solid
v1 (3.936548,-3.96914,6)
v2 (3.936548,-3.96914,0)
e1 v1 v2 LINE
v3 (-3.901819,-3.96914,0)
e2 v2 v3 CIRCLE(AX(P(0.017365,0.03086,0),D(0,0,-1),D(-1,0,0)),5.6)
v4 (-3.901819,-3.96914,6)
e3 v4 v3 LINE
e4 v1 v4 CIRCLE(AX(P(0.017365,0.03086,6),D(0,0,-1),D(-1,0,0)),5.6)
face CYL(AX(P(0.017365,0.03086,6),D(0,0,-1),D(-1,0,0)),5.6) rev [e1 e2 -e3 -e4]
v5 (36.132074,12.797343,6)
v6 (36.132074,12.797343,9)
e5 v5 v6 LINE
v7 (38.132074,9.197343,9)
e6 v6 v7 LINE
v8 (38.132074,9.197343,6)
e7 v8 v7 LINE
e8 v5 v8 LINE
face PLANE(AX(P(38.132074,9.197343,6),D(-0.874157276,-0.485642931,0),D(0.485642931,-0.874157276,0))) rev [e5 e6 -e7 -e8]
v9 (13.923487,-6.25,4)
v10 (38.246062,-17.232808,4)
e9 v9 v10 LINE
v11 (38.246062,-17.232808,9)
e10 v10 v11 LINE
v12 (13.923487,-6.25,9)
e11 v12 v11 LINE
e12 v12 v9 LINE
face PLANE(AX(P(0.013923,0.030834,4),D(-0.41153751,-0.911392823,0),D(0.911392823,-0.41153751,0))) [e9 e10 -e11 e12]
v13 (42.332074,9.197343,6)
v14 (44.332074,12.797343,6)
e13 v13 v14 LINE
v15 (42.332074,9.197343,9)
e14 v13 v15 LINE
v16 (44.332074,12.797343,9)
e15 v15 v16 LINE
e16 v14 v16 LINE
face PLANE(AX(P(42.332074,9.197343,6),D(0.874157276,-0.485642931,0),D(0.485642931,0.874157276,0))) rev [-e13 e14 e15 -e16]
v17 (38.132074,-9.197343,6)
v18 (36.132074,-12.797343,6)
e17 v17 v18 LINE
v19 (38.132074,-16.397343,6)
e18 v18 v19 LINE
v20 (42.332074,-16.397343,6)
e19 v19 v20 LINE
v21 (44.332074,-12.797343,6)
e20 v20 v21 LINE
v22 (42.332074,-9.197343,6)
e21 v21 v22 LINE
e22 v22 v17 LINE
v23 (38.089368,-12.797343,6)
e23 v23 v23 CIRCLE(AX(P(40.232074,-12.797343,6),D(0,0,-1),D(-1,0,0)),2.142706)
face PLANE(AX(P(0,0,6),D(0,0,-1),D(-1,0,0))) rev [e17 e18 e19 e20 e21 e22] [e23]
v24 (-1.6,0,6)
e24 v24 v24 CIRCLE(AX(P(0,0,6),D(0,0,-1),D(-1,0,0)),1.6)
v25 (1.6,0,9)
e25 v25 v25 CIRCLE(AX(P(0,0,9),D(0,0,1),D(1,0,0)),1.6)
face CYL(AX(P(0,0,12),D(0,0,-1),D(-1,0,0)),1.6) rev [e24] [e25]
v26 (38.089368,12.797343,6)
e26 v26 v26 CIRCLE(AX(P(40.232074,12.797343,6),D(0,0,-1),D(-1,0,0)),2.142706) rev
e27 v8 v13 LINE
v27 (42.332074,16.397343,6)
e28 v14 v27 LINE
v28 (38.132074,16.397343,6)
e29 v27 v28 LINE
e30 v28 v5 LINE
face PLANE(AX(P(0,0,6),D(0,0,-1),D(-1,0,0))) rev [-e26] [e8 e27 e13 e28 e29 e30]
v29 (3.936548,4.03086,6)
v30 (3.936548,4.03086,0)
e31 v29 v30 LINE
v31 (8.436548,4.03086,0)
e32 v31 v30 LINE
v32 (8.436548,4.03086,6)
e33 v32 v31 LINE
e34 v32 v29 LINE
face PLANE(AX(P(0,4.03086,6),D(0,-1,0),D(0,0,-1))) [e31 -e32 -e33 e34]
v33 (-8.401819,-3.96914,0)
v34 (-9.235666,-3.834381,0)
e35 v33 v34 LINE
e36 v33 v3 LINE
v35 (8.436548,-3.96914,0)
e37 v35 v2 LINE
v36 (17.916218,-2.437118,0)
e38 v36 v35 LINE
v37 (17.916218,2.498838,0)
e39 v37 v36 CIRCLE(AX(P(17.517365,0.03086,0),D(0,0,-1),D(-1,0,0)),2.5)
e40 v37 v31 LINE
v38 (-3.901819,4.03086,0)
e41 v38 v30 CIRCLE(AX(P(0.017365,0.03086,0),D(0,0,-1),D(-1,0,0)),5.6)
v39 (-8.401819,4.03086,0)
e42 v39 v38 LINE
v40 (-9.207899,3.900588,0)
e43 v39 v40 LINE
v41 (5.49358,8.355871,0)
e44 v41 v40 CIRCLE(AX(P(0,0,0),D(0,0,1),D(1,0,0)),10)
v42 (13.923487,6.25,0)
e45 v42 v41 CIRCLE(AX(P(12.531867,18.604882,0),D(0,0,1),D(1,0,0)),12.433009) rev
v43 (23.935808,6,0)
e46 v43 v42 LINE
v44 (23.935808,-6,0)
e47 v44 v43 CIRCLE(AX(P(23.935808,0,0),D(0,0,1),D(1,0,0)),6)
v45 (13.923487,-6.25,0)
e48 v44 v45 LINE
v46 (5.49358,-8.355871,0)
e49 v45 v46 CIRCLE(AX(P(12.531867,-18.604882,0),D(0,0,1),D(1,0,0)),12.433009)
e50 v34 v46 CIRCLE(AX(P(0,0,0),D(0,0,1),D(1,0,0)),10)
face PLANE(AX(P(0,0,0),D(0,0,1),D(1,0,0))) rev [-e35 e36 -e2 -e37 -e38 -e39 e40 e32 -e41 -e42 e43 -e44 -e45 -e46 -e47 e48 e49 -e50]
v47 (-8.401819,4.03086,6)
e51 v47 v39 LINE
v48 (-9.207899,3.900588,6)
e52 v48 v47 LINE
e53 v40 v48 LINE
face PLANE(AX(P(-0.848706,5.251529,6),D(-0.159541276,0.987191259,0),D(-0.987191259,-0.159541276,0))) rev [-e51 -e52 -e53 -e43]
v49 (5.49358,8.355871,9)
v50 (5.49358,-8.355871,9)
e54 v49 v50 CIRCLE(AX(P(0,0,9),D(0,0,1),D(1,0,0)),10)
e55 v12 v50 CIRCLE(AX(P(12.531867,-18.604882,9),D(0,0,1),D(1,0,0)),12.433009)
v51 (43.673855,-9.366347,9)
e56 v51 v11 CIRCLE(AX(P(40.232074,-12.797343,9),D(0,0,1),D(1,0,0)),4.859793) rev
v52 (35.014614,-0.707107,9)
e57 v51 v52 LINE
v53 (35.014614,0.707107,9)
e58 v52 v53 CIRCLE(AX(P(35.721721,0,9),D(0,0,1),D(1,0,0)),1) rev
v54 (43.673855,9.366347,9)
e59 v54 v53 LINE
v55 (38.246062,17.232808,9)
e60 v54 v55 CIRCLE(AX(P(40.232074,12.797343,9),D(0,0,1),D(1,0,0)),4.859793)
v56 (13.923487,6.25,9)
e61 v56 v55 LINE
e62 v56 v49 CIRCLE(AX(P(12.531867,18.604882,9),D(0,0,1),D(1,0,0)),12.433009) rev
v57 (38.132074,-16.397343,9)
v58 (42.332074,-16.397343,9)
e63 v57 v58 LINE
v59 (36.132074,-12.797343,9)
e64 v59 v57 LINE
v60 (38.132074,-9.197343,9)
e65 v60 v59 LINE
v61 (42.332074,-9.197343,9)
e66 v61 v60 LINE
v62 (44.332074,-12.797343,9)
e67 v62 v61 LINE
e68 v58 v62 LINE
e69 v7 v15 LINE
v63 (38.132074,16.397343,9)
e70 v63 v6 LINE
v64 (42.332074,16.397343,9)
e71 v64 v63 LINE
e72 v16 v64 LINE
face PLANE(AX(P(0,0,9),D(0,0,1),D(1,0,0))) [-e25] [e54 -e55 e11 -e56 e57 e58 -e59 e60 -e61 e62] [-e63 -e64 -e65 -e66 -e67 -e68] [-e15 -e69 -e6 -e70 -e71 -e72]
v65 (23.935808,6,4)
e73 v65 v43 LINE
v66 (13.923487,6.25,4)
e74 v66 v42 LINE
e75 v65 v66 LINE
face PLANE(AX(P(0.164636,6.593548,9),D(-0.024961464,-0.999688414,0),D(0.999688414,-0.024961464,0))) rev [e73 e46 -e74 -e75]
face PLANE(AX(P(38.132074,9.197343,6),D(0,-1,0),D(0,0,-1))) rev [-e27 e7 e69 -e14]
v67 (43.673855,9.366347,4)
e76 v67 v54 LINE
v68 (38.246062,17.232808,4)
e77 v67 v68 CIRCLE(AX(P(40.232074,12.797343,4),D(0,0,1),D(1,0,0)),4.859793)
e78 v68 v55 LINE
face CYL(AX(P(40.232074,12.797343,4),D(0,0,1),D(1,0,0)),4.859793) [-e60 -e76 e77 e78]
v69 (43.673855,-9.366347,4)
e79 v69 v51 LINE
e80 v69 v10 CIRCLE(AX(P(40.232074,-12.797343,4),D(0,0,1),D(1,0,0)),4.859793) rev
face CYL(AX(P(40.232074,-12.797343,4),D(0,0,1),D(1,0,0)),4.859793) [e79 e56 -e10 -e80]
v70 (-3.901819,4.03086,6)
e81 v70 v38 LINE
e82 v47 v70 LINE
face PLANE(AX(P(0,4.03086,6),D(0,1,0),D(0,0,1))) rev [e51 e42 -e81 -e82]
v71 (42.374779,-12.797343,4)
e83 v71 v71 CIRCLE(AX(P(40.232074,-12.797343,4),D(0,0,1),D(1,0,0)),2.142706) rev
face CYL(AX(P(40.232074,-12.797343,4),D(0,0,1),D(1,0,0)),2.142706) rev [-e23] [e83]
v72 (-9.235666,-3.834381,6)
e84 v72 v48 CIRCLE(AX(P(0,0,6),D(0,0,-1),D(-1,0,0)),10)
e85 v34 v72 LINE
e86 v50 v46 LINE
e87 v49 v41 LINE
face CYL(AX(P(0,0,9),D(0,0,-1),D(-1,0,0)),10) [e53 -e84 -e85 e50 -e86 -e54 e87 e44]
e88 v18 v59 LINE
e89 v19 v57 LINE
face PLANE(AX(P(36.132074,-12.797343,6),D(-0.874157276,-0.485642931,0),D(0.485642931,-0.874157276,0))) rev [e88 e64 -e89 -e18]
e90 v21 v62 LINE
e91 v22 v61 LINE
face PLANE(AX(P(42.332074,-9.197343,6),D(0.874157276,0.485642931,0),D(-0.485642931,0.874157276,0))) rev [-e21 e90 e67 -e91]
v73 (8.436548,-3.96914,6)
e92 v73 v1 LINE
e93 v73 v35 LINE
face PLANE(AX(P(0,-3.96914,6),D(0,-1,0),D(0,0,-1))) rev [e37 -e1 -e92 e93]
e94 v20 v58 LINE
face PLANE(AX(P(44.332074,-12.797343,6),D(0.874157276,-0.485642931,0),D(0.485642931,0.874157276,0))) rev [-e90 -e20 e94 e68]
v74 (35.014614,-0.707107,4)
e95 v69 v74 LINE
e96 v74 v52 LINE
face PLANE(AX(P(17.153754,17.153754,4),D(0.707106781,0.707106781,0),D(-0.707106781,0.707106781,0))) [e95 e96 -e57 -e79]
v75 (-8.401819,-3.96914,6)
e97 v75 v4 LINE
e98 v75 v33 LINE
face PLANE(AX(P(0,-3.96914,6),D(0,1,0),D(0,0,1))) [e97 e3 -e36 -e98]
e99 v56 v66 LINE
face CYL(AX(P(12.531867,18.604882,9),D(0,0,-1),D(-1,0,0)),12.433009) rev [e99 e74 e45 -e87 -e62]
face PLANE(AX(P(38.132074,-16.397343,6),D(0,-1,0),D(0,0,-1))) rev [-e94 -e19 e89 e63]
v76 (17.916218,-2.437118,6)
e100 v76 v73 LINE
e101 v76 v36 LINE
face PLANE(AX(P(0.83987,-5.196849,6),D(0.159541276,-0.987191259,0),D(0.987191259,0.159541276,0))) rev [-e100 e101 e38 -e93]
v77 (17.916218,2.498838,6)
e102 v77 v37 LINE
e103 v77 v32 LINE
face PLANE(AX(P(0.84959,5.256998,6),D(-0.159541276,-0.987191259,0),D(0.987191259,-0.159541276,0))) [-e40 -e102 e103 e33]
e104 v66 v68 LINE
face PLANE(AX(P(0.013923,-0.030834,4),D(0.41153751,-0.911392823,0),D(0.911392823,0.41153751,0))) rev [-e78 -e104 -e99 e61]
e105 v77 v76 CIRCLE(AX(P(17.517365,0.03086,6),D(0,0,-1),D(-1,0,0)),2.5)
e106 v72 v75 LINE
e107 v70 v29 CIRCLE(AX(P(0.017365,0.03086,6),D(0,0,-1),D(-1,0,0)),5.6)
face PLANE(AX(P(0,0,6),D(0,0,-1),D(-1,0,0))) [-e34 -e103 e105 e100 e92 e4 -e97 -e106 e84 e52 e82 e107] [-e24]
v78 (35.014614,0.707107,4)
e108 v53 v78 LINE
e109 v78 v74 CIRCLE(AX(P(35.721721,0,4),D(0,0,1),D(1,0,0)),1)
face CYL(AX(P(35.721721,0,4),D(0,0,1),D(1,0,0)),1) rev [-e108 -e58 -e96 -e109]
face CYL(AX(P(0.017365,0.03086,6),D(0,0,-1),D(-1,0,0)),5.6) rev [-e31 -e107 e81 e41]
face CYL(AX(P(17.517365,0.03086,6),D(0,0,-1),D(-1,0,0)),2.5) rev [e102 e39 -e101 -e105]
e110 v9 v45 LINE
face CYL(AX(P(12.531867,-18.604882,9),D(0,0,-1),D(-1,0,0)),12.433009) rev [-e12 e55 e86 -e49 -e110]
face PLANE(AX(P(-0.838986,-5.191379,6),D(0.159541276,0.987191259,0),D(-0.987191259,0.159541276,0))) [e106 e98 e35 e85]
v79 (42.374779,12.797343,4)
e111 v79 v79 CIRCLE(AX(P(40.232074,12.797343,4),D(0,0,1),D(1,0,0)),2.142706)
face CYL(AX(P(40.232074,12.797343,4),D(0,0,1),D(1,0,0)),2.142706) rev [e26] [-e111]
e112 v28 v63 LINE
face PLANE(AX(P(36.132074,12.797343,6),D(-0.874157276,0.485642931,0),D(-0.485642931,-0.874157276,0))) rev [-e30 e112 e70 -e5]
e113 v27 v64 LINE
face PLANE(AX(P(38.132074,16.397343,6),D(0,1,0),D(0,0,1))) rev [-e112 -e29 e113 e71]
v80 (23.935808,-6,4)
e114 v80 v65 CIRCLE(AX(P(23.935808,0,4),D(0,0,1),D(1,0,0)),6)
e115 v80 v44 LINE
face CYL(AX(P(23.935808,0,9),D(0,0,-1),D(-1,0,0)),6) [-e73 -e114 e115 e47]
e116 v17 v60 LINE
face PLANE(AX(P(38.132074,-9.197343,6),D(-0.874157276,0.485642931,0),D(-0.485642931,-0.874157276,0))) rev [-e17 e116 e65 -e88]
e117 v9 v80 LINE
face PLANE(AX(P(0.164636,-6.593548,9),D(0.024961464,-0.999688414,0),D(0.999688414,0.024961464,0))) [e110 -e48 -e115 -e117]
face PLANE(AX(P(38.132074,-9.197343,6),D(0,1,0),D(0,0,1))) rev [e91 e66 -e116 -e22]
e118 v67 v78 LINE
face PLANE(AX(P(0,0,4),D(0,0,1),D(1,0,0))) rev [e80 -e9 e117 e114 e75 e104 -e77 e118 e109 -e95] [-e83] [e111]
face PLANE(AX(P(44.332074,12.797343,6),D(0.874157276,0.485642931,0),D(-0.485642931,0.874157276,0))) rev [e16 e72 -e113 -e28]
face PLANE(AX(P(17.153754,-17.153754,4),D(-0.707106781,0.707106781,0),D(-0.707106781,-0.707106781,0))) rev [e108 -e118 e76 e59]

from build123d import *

# Parameters (mm, degrees)
BOSS_EXTRUDE1_DEPTH = 9
BOSS_EXTRUDE2_START = -5
SKETCH6_R           = 2.142705637
BOSS_EXTRUDE2_DEPTH = 5
CUT_EXTRUDE1_DEPTH  = 6
SKETCH9_R           = 1.6
CUT_EXTRUDE2_DEPTH  = 6
CUT_EXTRUDE3_DEPTH  = 3
FILLET1_R           = 1


with BuildPart() as part:
    # Sketch2 → Boss-Extrude1 (new body)
    with BuildSketch(Plane.XY):
        with BuildLine():
            Line((13.923486695, -6.250000093), (23.935808117, -6))
            ThreePointArc((23.935808117, -6), (29.935808117, 0), (23.935808117, 6))
            Line((23.935808117, 6), (13.923486695, 6.250000093))
            ThreePointArc((13.923486695, 6.250000093), (9.518581948, 6.542551177), (5.493579732, 8.355871093))
            ThreePointArc((5.493579732, 8.355871093), (-10, 0), (5.493579732, -8.355871093))
            ThreePointArc((5.493579732, -8.355871093), (9.518581948, -6.542551177), (13.923486695, -6.250000093))
        make_face()
    extrude(amount=BOSS_EXTRUDE1_DEPTH)

    # Sketch6 → Boss-Extrude2 (add)
    with BuildSketch(Plane.XY.offset(9).offset(BOSS_EXTRUDE2_START)):
        with BuildLine():
            Line((38.246061815, 17.232807658), (13.923486695, 6.250000093))
            Line((13.923486695, 6.250000093), (23.935808117, 6))
            ThreePointArc((23.935808117, 6), (28.178449102, 4.242640389), (29.935808117, -8.43e-07))
            ThreePointArc((29.935808117, -8.43e-07), (28.178448506, -4.242640985), (23.935808117, -6))
            Line((23.935808117, -6), (13.923486695, -6.250000093))
            Line((13.923486695, -6.250000093), (38.246061815, -17.232807658))
            ThreePointArc((38.246061815, -17.232807658), (42.874608669, -16.875896473), (45.091866788, -12.797343053))
            ThreePointArc((45.091866788, -12.797343053), (44.723394897, -10.941104168), (43.673854661, -9.366347162))
            Line((43.673854661, -9.366347162), (34.3075075, 0))
            Line((34.3075075, 0), (43.673854661, 9.366347162))
            ThreePointArc((43.673854661, 9.366347162), (44.723394897, 10.941104168), (45.091866788, 12.797343053))
            ThreePointArc((45.091866788, 12.797343053), (42.874608669, 16.875896473), (38.246061815, 17.232807658))
        make_face()
        with Locations((40.232073655, -12.797343053)):
            Circle(SKETCH6_R, mode=Mode.SUBTRACT)
        with Locations((40.232073655, 12.797343053)):
            Circle(SKETCH6_R, mode=Mode.SUBTRACT)
    extrude(amount=BOSS_EXTRUDE2_DEPTH)

    # Sketch7 → Cut-Extrude1 (cut)
    with BuildSketch(Plane(origin=(0, 0, 0), x_dir=(-1, 0, 0), z_dir=(0, 0, -1))):
        with BuildLine():
            ThreePointArc((17.881488686, -2.43711799), (19.982635496, 0.030860156), (17.881488686, 2.498838303))
            Line((17.881488686, 2.498838303), (8.401819085, 4.030860156))
            Line((8.401819085, 4.030860156), (3.901819085, 4.030860156))
            ThreePointArc((3.901819085, 4.030860156), (-0.017364504, 5.630860156), (-3.936548092, 4.030860156))
            Line((-3.936548092, 4.030860156), (-8.436548092, 4.030860156))
            Line((-8.436548092, 4.030860156), (-17.916217693, 2.498838303))
            ThreePointArc((-17.916217693, 2.498838303), (-20.017364504, 0.030860156), (-17.916217693, -2.43711799))
            Line((-17.916217693, -2.43711799), (-8.436548092, -3.969139844))
            Line((-8.436548092, -3.969139844), (-3.936548092, -3.969139844))
            ThreePointArc((-3.936548092, -3.969139844), (-0.017364504, -5.569139844), (3.901819085, -3.969139844))
            Line((3.901819085, -3.969139844), (8.401819085, -3.969139844))
            Line((8.401819085, -3.969139844), (17.881488686, -2.43711799))
        make_face()
    extrude(amount=-CUT_EXTRUDE1_DEPTH, mode=Mode.SUBTRACT)

    # Sketch9 → Cut-Extrude2 (cut)
    with BuildSketch(Plane(origin=(0, 0, 6), x_dir=(-1, 0, 0), z_dir=(0, 0, -1))):
        Circle(SKETCH9_R)
    extrude(amount=-CUT_EXTRUDE2_DEPTH, mode=Mode.SUBTRACT)

    # Sketch10 → Cut-Extrude3 (cut)
    with BuildSketch(Plane.XY.offset(9)):
        Polygon((38.132073655, 9.197343053), (42.332073655, 9.197343053), (44.332073655, 12.797343053), (42.332073655, 16.397343053), (38.132073655, 16.397343053), (36.132073655, 12.797343053), align=None)
        Polygon((38.132073655, -9.197343053), (36.132073655, -12.797343053), (38.132073655, -16.397343053), (42.332073655, -16.397343053), (44.332073655, -12.797343053), (42.332073655, -9.197343053), align=None)
    extrude(amount=-CUT_EXTRUDE3_DEPTH, mode=Mode.SUBTRACT)

    # Fillet1
    fillet1_edges = [part.edges().sort_by_distance(p)[0] for p in [
        (34.3075075, 0, 6.5),
    ]]
    fillet(fillet1_edges, radius=FILLET1_R)


solid = part.part
